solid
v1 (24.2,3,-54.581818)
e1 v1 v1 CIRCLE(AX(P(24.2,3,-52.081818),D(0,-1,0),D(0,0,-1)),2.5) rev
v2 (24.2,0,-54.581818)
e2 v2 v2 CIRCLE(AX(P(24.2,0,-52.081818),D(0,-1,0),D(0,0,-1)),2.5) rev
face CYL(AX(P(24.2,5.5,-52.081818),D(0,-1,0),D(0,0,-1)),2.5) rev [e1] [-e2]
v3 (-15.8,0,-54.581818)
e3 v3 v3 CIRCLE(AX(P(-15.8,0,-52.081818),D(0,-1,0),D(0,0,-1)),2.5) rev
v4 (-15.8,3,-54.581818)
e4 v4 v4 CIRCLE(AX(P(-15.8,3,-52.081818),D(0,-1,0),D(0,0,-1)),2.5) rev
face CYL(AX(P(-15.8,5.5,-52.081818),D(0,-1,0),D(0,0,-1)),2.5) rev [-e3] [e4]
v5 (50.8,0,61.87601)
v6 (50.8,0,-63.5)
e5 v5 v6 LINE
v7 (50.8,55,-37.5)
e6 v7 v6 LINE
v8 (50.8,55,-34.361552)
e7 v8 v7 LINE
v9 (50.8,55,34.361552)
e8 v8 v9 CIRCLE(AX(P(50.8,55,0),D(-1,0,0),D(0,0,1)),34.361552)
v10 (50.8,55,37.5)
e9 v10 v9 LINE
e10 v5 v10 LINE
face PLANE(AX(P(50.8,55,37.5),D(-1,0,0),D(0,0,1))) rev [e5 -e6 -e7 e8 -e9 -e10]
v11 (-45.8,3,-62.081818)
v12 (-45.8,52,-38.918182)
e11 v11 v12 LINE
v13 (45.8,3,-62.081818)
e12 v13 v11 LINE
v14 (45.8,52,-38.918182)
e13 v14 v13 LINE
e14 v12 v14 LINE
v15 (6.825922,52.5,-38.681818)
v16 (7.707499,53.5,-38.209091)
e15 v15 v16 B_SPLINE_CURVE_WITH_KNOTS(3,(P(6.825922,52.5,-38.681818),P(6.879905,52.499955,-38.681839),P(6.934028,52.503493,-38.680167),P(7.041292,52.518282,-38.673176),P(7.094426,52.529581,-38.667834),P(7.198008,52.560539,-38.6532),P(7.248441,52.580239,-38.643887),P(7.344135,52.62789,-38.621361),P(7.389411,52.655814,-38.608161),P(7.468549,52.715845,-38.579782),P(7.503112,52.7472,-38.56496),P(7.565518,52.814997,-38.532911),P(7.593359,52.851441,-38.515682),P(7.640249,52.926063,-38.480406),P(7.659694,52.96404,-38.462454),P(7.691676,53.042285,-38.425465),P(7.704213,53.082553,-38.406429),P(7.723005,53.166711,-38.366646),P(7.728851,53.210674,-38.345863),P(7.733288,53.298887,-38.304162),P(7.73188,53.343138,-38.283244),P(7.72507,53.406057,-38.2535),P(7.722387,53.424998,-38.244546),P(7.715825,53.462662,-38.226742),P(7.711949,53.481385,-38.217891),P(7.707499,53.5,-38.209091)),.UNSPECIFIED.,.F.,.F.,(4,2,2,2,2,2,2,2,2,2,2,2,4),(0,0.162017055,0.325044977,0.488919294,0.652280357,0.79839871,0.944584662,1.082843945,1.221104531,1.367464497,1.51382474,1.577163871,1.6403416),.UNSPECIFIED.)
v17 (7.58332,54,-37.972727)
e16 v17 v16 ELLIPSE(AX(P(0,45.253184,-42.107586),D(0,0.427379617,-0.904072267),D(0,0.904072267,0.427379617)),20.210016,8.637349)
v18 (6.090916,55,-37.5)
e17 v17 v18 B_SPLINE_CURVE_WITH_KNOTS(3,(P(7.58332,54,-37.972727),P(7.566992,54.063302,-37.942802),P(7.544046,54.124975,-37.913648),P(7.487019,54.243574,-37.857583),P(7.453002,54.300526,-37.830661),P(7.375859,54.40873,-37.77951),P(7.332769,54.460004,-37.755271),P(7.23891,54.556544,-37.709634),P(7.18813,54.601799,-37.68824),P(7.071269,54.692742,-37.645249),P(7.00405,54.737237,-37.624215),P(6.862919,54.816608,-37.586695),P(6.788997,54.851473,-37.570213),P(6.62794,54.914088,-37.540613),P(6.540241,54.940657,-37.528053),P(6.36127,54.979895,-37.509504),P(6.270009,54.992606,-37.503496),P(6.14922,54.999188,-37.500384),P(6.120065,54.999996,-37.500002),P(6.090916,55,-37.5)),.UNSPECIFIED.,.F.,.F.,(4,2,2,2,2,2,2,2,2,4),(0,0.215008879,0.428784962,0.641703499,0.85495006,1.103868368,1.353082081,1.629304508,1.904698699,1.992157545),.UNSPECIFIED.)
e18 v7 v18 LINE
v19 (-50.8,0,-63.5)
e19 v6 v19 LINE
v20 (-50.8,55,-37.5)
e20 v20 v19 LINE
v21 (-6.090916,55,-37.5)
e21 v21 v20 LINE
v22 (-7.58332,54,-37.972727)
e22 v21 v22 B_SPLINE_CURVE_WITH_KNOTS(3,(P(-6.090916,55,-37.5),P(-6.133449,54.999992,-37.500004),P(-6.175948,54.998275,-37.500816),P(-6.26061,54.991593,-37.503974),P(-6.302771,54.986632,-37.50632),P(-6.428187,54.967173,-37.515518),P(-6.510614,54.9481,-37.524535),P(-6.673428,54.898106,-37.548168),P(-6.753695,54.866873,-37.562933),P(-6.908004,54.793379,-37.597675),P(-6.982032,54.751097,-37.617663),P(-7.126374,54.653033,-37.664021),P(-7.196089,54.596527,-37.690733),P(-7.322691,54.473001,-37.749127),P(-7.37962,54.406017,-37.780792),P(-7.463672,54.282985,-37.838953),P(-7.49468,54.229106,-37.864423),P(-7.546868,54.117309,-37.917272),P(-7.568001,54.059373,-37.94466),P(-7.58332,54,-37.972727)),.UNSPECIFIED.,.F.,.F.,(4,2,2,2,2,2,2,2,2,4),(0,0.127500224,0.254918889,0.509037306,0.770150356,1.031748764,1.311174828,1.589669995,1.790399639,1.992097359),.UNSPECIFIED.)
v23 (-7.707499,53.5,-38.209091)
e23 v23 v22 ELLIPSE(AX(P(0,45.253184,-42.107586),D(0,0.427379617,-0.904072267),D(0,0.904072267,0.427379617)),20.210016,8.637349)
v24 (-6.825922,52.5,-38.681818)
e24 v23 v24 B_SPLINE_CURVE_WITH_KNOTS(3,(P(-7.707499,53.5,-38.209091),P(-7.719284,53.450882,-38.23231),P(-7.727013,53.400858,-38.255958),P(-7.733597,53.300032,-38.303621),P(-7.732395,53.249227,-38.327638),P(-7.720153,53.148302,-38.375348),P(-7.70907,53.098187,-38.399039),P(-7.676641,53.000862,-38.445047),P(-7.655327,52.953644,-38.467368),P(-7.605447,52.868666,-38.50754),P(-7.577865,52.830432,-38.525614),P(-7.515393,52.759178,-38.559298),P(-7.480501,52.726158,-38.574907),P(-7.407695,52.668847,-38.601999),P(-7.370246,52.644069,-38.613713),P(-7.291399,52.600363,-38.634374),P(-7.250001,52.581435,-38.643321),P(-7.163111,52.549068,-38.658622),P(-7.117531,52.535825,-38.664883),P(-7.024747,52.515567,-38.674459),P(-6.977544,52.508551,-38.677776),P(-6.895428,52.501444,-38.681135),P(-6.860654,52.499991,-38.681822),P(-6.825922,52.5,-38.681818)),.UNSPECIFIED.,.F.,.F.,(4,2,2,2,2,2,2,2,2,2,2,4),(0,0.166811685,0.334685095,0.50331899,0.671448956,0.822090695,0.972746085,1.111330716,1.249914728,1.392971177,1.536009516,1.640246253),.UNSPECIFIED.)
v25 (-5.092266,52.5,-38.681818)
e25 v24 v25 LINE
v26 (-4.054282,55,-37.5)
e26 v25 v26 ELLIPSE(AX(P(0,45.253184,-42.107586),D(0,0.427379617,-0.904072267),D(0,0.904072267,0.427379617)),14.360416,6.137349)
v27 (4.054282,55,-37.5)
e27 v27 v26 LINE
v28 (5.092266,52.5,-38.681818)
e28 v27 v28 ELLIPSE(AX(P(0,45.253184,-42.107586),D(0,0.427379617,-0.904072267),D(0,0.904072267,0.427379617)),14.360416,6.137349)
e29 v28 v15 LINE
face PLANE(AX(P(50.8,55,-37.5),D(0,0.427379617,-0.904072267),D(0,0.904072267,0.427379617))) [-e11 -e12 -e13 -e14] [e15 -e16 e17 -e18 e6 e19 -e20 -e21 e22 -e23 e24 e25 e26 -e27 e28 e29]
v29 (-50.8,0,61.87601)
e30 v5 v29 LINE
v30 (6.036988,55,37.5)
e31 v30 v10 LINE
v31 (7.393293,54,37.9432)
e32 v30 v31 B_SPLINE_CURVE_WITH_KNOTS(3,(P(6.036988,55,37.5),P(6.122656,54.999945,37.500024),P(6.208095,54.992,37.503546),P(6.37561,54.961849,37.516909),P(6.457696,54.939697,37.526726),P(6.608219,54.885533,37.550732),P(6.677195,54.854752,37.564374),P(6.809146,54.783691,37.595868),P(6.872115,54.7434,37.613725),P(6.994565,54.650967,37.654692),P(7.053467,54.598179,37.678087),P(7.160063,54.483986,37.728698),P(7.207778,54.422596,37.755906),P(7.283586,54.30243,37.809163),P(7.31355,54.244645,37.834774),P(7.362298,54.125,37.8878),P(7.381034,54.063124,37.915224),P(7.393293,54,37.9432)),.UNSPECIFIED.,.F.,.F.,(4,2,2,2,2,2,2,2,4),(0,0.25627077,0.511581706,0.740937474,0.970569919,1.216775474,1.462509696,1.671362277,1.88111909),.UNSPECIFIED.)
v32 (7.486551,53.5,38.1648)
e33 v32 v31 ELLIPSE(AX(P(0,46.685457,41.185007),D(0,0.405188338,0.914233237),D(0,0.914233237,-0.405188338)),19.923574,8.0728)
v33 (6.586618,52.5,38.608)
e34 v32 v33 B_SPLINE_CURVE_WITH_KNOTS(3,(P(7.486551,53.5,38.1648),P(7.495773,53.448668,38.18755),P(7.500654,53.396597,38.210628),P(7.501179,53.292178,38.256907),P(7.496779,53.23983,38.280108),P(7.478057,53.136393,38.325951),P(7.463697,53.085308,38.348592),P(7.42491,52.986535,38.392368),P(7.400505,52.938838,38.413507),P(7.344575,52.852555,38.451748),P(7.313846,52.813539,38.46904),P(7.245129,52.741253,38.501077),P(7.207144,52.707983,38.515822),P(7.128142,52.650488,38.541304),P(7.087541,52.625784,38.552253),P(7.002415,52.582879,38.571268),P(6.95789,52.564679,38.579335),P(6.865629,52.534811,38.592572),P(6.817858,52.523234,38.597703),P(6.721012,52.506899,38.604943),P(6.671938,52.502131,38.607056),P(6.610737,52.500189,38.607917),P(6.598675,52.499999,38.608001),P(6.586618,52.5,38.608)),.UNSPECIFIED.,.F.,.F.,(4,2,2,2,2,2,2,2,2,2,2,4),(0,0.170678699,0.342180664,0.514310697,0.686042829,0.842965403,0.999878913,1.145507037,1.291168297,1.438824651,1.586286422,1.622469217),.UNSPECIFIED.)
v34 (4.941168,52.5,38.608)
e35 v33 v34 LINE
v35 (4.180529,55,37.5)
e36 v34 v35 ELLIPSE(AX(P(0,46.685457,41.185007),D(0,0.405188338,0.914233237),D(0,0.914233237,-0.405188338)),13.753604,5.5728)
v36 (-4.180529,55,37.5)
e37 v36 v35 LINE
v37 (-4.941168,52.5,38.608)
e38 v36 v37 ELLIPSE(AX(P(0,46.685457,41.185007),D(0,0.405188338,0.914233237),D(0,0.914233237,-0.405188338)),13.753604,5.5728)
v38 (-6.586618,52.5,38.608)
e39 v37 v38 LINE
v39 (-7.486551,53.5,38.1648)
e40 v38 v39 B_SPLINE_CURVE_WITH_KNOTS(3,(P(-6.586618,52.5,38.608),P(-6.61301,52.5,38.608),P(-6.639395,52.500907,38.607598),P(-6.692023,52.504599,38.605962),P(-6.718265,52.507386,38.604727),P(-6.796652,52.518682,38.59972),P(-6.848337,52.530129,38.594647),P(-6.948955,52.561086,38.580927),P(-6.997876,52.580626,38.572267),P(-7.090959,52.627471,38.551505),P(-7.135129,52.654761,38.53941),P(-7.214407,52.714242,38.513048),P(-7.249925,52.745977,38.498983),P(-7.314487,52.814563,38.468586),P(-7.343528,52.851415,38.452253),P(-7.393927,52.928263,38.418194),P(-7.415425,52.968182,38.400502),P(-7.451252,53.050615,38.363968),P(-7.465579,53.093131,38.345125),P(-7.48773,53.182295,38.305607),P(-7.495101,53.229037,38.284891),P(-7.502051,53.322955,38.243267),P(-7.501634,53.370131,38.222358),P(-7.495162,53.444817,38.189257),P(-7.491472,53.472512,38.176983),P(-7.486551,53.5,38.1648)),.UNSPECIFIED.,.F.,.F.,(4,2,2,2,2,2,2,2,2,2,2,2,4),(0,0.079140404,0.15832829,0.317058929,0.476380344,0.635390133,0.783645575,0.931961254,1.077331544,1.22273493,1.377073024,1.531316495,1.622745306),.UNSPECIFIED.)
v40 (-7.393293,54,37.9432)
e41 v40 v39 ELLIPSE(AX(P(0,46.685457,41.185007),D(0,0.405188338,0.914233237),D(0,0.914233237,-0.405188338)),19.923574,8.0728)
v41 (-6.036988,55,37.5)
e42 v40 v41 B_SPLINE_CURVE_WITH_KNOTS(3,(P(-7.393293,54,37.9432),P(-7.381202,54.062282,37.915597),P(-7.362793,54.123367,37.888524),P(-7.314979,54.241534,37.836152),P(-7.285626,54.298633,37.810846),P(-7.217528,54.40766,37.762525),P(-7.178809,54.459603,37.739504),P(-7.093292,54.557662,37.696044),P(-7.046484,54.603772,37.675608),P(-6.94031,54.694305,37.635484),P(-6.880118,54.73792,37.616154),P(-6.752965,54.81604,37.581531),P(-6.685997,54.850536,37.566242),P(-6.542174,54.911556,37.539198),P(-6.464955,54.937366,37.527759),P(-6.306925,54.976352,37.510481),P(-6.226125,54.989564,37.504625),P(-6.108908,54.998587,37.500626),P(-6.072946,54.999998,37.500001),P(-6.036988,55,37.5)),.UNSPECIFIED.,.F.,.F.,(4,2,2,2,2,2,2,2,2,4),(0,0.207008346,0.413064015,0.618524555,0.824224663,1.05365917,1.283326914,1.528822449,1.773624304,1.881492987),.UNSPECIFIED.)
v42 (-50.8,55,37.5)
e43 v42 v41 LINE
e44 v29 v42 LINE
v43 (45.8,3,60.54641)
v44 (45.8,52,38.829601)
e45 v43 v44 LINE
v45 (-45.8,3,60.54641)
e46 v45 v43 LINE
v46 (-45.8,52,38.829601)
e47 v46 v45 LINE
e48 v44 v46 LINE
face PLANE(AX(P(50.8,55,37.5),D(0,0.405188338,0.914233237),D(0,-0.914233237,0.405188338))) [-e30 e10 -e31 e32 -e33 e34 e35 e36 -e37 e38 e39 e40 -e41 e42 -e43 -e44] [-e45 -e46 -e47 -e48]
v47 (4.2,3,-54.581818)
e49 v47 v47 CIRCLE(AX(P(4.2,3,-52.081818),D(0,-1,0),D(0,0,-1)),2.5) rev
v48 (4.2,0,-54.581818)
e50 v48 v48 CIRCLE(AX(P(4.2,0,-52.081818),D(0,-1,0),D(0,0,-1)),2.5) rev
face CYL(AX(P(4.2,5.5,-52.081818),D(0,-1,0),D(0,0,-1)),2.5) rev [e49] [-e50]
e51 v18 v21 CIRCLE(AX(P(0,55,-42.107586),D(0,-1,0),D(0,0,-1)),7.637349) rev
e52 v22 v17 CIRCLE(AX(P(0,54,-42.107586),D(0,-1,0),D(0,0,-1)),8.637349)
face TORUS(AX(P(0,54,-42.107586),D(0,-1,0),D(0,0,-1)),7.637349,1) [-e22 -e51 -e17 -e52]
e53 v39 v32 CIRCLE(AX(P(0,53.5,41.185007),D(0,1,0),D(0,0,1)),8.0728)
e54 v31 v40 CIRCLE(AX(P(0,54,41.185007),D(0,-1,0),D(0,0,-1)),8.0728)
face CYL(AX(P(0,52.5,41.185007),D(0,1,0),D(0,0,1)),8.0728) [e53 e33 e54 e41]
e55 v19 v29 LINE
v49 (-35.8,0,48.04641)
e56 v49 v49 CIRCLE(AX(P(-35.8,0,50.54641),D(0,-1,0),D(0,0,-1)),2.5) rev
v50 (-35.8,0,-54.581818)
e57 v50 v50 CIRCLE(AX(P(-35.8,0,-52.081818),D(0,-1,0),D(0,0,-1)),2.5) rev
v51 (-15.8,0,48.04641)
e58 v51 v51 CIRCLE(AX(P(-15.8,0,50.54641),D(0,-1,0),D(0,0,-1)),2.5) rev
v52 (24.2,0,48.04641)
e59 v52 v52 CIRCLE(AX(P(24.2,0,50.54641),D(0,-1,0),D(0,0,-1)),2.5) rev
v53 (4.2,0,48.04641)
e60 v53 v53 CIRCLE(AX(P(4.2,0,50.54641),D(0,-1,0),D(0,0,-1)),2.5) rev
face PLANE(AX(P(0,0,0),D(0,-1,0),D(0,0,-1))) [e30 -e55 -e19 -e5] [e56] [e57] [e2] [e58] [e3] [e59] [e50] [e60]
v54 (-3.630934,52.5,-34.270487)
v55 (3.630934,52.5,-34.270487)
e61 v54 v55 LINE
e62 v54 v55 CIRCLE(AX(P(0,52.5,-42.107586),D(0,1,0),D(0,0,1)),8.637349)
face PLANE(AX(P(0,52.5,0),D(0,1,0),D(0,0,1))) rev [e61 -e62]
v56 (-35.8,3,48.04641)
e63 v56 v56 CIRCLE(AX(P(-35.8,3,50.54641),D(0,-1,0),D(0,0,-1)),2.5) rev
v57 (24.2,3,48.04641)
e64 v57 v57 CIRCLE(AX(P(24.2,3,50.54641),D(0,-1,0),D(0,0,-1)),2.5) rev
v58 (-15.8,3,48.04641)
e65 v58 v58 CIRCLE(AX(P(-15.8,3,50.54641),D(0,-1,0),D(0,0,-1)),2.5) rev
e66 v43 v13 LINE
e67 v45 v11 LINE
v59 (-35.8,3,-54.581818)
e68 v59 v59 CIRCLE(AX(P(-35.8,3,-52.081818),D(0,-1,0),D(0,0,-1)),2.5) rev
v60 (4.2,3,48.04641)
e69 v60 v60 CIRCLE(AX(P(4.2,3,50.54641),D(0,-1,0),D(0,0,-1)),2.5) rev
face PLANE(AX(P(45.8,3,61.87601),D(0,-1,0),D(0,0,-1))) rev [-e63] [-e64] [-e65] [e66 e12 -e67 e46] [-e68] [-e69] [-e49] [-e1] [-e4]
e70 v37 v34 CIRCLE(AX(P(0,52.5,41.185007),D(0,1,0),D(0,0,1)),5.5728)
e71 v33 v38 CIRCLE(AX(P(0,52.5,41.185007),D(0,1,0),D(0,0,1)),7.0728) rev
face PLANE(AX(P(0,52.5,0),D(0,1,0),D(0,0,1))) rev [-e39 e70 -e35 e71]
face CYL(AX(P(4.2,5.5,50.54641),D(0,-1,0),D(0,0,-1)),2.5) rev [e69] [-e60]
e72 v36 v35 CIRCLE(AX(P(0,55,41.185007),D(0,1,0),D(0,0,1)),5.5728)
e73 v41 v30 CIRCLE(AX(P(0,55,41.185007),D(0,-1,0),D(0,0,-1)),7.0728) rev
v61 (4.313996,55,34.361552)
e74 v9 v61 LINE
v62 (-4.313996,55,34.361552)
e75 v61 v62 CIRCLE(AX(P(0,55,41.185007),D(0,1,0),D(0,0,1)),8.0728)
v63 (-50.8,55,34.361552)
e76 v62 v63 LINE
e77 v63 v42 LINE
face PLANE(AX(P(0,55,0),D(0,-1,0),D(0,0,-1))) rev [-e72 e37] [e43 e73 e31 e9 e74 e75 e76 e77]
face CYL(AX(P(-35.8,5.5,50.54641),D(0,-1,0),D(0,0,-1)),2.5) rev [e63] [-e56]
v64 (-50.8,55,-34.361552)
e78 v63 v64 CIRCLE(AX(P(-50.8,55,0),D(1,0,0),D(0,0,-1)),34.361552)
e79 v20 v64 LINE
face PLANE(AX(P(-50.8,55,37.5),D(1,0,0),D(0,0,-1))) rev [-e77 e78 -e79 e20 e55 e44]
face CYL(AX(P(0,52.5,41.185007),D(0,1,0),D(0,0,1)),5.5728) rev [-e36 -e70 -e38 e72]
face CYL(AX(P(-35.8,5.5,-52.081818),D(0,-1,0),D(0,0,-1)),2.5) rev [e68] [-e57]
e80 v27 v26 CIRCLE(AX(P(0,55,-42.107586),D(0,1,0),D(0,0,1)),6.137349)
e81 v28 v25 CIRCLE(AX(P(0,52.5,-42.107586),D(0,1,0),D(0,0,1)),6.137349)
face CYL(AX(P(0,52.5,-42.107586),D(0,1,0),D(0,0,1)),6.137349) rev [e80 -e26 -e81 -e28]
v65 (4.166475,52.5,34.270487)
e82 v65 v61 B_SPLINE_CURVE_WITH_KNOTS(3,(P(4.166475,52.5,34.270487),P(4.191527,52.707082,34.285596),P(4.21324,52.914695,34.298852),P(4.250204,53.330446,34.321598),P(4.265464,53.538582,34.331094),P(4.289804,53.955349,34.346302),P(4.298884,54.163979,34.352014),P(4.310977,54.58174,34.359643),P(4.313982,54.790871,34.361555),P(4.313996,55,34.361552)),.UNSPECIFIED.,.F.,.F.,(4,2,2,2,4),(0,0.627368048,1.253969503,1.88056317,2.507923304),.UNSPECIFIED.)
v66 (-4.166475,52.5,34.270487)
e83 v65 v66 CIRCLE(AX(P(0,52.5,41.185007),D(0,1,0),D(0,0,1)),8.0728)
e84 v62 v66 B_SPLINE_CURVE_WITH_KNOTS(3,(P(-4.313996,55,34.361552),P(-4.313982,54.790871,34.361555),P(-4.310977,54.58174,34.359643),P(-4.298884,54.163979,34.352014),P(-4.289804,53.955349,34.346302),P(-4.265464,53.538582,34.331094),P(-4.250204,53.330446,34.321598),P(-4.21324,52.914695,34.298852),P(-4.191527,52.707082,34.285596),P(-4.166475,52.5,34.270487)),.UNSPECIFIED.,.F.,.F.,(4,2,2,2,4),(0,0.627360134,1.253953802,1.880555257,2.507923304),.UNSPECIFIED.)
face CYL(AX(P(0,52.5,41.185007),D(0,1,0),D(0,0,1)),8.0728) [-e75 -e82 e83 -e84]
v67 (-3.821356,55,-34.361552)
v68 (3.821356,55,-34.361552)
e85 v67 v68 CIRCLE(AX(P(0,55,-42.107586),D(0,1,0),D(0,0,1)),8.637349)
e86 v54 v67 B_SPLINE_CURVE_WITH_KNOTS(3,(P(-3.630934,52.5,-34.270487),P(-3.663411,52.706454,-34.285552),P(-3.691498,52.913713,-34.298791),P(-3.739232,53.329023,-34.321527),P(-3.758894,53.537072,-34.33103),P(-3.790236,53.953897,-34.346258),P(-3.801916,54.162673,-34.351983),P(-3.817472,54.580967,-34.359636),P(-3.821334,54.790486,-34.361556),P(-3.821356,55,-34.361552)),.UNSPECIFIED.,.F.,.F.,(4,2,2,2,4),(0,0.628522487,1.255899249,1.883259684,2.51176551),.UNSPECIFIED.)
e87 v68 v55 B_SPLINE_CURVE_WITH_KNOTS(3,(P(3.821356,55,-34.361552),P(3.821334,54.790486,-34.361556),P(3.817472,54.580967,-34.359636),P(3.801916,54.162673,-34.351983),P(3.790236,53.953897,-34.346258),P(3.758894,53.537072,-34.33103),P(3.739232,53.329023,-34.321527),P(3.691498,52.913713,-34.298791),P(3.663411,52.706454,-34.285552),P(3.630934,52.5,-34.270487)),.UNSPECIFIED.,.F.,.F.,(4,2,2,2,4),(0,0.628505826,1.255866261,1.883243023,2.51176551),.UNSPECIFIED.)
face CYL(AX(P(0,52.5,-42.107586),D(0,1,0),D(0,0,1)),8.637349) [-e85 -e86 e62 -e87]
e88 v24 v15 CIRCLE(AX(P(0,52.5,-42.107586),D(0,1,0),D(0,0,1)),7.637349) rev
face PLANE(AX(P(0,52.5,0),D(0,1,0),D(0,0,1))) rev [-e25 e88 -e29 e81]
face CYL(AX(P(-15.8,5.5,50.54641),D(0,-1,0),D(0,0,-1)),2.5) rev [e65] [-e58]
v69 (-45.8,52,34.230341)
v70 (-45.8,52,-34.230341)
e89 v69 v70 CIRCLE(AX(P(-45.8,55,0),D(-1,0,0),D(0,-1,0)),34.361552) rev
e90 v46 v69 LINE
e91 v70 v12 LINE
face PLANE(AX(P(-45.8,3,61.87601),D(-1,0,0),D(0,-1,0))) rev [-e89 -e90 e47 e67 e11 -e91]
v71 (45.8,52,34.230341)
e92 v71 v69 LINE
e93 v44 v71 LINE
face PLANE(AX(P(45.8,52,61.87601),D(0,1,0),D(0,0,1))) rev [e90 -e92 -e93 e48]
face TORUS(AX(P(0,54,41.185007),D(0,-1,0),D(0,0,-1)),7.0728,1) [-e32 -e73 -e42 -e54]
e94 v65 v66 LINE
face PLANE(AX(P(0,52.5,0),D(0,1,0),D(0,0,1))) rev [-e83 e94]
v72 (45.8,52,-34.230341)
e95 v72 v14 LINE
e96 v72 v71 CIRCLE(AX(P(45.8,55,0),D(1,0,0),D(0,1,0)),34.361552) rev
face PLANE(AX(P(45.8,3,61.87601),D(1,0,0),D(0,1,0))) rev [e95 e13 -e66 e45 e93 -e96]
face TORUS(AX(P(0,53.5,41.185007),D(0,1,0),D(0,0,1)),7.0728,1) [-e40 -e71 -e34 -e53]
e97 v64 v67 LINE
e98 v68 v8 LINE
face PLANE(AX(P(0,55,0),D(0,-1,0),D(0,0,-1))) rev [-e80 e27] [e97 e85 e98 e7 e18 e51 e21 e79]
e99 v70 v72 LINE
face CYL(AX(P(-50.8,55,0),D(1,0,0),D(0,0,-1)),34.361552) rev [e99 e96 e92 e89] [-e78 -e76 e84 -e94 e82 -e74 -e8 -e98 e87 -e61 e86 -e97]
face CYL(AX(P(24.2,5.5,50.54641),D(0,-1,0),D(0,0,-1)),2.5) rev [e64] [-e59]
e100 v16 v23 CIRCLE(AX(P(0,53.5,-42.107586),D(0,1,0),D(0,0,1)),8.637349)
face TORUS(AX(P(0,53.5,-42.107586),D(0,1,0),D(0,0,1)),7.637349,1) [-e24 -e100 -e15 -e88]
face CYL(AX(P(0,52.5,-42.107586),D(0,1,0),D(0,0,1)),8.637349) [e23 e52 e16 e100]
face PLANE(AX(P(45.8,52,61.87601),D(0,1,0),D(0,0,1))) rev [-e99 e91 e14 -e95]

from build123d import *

# Parameters (mm, degrees)
SKETCH3_W               = 101.6
SKETCH3_H               = 75
BOSS_EXTRUDE2_DEPTH     = 55
CUT_EXTRUDE2_DEPTH      = 122.465262524
CUT_EXTRUDE2_DEPTH_BACK = 122.465262524
SKETCH4_R               = 34.361552214
BOSS_EXTRUDE4_DEPTH     = 101.6
BOSS_EXTRUDE5_DEPTH     = 101.6
CUT_EXTRUDE3_DEPTH      = 125.423596536
CUT_EXTRUDE3_DEPTH_BACK = 125.423596536
SKETCH9_W               = 91.6
SKETCH9_H               = 49
SKETCH11_R              = 8.637348936
SKETCH11_R_2            = 6.137348936
BOSS_EXTRUDE6_DEPTH     = 2.5
FILLET2_R               = 1
BOSS_EXTRUDE7_START     = -2.5
BOSS_EXTRUDE7_DEPTH     = 2.5
FILLET3_R               = 1
CUT_EXTRUDE4_START      = -10
SKETCH13_R              = 2.5
CUT_EXTRUDE4_DEPTH      = 12.5
CUT_EXTRUDE5_START      = -7.5
SKETCH14_R              = 2.5
CUT_EXTRUDE5_DEPTH      = 10
LPATTERN2_COUNT         = 4
LPATTERN2_PITCH         = 20
LPATTERN3_COUNT         = 4
LPATTERN3_PITCH         = 20


with BuildPart() as part:
    # Sketch3 → Boss-Extrude2 (new body)
    with BuildSketch(Plane(origin=(0, 0, 0), x_dir=(1, 0, 0), z_dir=(0, 1, 0))):
        Rectangle(SKETCH3_W, SKETCH3_H)
    extrude(amount=BOSS_EXTRUDE2_DEPTH)

    # Sketch4 → Cut-Extrude2 (cut, two sides: drawn at the far end of the back side and taken through both)
    with BuildSketch(Plane(origin=(50.8, 0, 0), x_dir=(0, 0, -1), z_dir=(1, 0, 0)).offset(-CUT_EXTRUDE2_DEPTH_BACK)):
        with Locations((0, 55)):
            Circle(SKETCH4_R)
    extrude(amount=CUT_EXTRUDE2_DEPTH + CUT_EXTRUDE2_DEPTH_BACK, mode=Mode.SUBTRACT)

    # Sketch7 → Boss-Extrude4 (add)
    with BuildSketch(Plane.ZY.offset(50.8)):
        Polygon((-37.5, 55), (-63.5, 0), (-37.5, 0), align=None)
    extrude(amount=-BOSS_EXTRUDE4_DEPTH)

    # Sketch8 → Boss-Extrude5 (add)
    with BuildSketch(Plane.ZY.offset(50.8)):
        Polygon((37.5, 55), (61.876010058, 0), (37.5, 0), align=None)
    extrude(amount=-BOSS_EXTRUDE5_DEPTH)

    # Sketch9 → Cut-Extrude3 (cut, two sides: drawn at the far end of the back side and taken through both)
    with BuildSketch(Plane(origin=(0, 0, -37.5), x_dir=(-1, 0, 0), z_dir=(0, 0, -1)).offset(-CUT_EXTRUDE3_DEPTH_BACK)):
        with Locations((0, 27.5)):
            Rectangle(SKETCH9_W, SKETCH9_H)
    extrude(amount=CUT_EXTRUDE3_DEPTH + CUT_EXTRUDE3_DEPTH_BACK, mode=Mode.SUBTRACT)

    # Sketch11 → Boss-Extrude6 (add)
    with BuildSketch(Plane(origin=(0, 55, 0), x_dir=(1, 0, 0), z_dir=(0, 1, 0))):
        with Locations((0, 42.107585669)):
            Circle(SKETCH11_R)
        with Locations((0, 42.107585669)):
            Circle(SKETCH11_R_2, mode=Mode.SUBTRACT)
    extrude(amount=-BOSS_EXTRUDE6_DEPTH)

    # Fillet2
    # the kernel refuses this fillet: 1 mm, written as the material it takes off along each edge
    with BuildSketch(Plane(origin=(0, 52.5, -42.107585669), x_dir=(0.7661198217735417, 0, 0.6426977662056067), z_dir=(-0.6426977662056067, 0, 0.7661198217735417))) as fillet2_piece_1_section:
        with BuildLine():
            CenterArc((8.637348936 - FILLET2_R, FILLET2_R), FILLET2_R, 270, 90)
            Line((8.637348936, FILLET2_R), (8.637348936, 0))
            Line((8.637348936, 0), (8.637348936 - FILLET2_R, 0))
        make_face()
    fillet2_piece_1 = revolve(axis=Axis((0, 52.5, -42.107585669), (0, 1, 0)), revolution_arc=259.986561096, mode=Mode.PRIVATE)
    fillet2_piece_1 = split(fillet2_piece_1, bisect_by=Plane(origin=(0, 51.176344905, -39.307546045), z_dir=(0, 0.42737961689341614, -0.9040722665053037)), keep=Keep.TOP, mode=Mode.PRIVATE)
    add(fillet2_piece_1, mode=Mode.SUBTRACT)
    with BuildSketch(Plane(origin=(0, 55, -42.107585669), x_dir=(0.6577465140217427, 0, 0.753239353255156), z_dir=(-0.753239353255156, 0, 0.6577465140217427))) as fillet2_piece_2_section:
        with BuildLine():
            CenterArc((8.637348936 - FILLET2_R, -FILLET2_R), FILLET2_R, 0, 90)
            Line((8.637348936 - FILLET2_R, 0), (8.637348936, 0))
            Line((8.637348936, 0), (8.637348936, -FILLET2_R))
        make_face()
    fillet2_piece_2 = revolve(axis=Axis((0, 55, -42.107585669), (0, 1, 0)), revolution_arc=277.743530493, mode=Mode.PRIVATE)
    fillet2_piece_2 = split(fillet2_piece_2, bisect_by=Plane(origin=(0, 53.219711563, -38.341590898), z_dir=(0, 0.42737961689341614, -0.9040722665053037)), keep=Keep.TOP, mode=Mode.PRIVATE)
    add(fillet2_piece_2, mode=Mode.SUBTRACT)

    # Boss-Extrude7: read off the stored shape, not the designer's step
    # Boss-Extrude7 outline → Boss-Extrude7 (add)
    with BuildSketch(Plane(origin=(0, 55, 0), x_dir=(1, 0, 0), z_dir=(0, 1, 0)).offset(BOSS_EXTRUDE7_START)):
        with BuildLine():
            Line((-50.8, -34.361552214), (-50.8, -37.5))
            Line((-50.8, -37.5), (-7.182675213, -37.5))
            ThreePointArc((-7.182675213, -37.5), (0, -49.257807046), (7.182675213, -37.5))
            Line((7.182675213, -37.5), (50.8, -37.5))
            Line((50.8, -37.5), (50.8, -34.361552214))
            Line((50.8, -34.361552214), (4.313996334, -34.361552214))
            ThreePointArc((4.313996334, -34.361552214), (0, -33.11220702), (-4.313996334, -34.361552214))
            Line((-4.313996334, -34.361552214), (-50.8, -34.361552214))
        make_face()
        with BuildLine():
            ThreePointArc((4.180529051, -37.5), (0, -46.757807046), (-4.180529051, -37.5))
            Line((-4.180529051, -37.5), (4.180529051, -37.5))
        make_face(mode=Mode.SUBTRACT)
    extrude(amount=BOSS_EXTRUDE7_DEPTH)

    # Fillet3
    # the kernel refuses this fillet: 1 mm, written as the material it takes off along each edge
    with BuildSketch(Plane(origin=(0, 52.5, 41.185007033), x_dir=(-0.8048848647873229, 0, -0.5934310022540891), z_dir=(0.5934310022540891, 0, -0.8048848647873229))) as fillet3_piece_1_section:
        with BuildLine():
            CenterArc((8.072800013 - FILLET3_R, FILLET3_R), FILLET3_R, 270, 90)
            Line((8.072800013 - FILLET3_R, 0), (8.072800013, 0))
            Line((8.072800013, 0), (8.072800013, FILLET3_R))
        make_face()
    fillet3_piece_1 = revolve(axis=Axis((0, 52.5, 41.185007033), (0, 1, 0)), revolution_arc=252.801724897, mode=Mode.PRIVATE)
    fillet3_piece_1 = split(fillet3_piece_1, bisect_by=Plane(origin=(0, 51.545382329, 39.031087184), z_dir=(0, 0.4051883376708072, 0.9142332366609561)), keep=Keep.TOP, mode=Mode.PRIVATE)
    add(fillet3_piece_1, mode=Mode.SUBTRACT)
    with BuildSketch(Plane(origin=(0, 55, 41.185007033), x_dir=(-0.7077045492924725, 0, -0.7065085073166059), z_dir=(0.7065085073166059, 0, -0.7077045492924725))) as fillet3_piece_2_section:
        with BuildLine():
            CenterArc((8.072800013 - FILLET3_R, -FILLET3_R), FILLET3_R, 0, 90)
            Line((8.072800013, -FILLET3_R), (8.072800013, 0))
            Line((8.072800013, 0), (8.072800013 - FILLET3_R, 0))
        make_face()
    fillet3_piece_2 = revolve(axis=Axis((0, 55, 41.185007033), (0, 1, 0)), revolution_arc=269.903086539, mode=Mode.PRIVATE)
    fillet3_piece_2 = split(fillet3_piece_2, bisect_by=Plane(origin=(0, 53.634938356, 38.10499557), z_dir=(0, 0.4051883376708072, 0.9142332366609561)), keep=Keep.TOP, mode=Mode.PRIVATE)
    add(fillet3_piece_2, mode=Mode.SUBTRACT)

    # Sketch13 → Cut-Extrude4 (cut)
    with BuildSketch(Plane(origin=(0, 3, 0), x_dir=(1, 0, 0), z_dir=(0, 1, 0)).offset(CUT_EXTRUDE4_START)):
        with Locations(Location((-35.8, -50.546409509, 0), (0, 0, 90))):
            Circle(SKETCH13_R)
    cut_extrude4 = extrude(amount=CUT_EXTRUDE4_DEPTH, mode=Mode.SUBTRACT)

    # Sketch14 → Cut-Extrude5 (cut)
    with BuildSketch(Plane(origin=(0, 3, 0), x_dir=(1, 0, 0), z_dir=(0, 1, 0)).offset(CUT_EXTRUDE5_START)):
        with Locations(Location((-35.8, 52.081818182, 0), (0, 0, 90))):
            Circle(SKETCH14_R)
    cut_extrude5 = extrude(amount=CUT_EXTRUDE5_DEPTH, mode=Mode.SUBTRACT)

    # LPattern2: Cut-Extrude4 ×4
    with Locations(*[(i * LPATTERN2_PITCH, 0, 0) for i in range(1, LPATTERN2_COUNT)]):
        add(cut_extrude4, mode=Mode.SUBTRACT)

    # LPattern3: Cut-Extrude5 ×4
    with Locations(*[(i * LPATTERN3_PITCH, 0, 0) for i in range(1, LPATTERN3_COUNT)]):
        add(cut_extrude5, mode=Mode.SUBTRACT)


solid = part.part
